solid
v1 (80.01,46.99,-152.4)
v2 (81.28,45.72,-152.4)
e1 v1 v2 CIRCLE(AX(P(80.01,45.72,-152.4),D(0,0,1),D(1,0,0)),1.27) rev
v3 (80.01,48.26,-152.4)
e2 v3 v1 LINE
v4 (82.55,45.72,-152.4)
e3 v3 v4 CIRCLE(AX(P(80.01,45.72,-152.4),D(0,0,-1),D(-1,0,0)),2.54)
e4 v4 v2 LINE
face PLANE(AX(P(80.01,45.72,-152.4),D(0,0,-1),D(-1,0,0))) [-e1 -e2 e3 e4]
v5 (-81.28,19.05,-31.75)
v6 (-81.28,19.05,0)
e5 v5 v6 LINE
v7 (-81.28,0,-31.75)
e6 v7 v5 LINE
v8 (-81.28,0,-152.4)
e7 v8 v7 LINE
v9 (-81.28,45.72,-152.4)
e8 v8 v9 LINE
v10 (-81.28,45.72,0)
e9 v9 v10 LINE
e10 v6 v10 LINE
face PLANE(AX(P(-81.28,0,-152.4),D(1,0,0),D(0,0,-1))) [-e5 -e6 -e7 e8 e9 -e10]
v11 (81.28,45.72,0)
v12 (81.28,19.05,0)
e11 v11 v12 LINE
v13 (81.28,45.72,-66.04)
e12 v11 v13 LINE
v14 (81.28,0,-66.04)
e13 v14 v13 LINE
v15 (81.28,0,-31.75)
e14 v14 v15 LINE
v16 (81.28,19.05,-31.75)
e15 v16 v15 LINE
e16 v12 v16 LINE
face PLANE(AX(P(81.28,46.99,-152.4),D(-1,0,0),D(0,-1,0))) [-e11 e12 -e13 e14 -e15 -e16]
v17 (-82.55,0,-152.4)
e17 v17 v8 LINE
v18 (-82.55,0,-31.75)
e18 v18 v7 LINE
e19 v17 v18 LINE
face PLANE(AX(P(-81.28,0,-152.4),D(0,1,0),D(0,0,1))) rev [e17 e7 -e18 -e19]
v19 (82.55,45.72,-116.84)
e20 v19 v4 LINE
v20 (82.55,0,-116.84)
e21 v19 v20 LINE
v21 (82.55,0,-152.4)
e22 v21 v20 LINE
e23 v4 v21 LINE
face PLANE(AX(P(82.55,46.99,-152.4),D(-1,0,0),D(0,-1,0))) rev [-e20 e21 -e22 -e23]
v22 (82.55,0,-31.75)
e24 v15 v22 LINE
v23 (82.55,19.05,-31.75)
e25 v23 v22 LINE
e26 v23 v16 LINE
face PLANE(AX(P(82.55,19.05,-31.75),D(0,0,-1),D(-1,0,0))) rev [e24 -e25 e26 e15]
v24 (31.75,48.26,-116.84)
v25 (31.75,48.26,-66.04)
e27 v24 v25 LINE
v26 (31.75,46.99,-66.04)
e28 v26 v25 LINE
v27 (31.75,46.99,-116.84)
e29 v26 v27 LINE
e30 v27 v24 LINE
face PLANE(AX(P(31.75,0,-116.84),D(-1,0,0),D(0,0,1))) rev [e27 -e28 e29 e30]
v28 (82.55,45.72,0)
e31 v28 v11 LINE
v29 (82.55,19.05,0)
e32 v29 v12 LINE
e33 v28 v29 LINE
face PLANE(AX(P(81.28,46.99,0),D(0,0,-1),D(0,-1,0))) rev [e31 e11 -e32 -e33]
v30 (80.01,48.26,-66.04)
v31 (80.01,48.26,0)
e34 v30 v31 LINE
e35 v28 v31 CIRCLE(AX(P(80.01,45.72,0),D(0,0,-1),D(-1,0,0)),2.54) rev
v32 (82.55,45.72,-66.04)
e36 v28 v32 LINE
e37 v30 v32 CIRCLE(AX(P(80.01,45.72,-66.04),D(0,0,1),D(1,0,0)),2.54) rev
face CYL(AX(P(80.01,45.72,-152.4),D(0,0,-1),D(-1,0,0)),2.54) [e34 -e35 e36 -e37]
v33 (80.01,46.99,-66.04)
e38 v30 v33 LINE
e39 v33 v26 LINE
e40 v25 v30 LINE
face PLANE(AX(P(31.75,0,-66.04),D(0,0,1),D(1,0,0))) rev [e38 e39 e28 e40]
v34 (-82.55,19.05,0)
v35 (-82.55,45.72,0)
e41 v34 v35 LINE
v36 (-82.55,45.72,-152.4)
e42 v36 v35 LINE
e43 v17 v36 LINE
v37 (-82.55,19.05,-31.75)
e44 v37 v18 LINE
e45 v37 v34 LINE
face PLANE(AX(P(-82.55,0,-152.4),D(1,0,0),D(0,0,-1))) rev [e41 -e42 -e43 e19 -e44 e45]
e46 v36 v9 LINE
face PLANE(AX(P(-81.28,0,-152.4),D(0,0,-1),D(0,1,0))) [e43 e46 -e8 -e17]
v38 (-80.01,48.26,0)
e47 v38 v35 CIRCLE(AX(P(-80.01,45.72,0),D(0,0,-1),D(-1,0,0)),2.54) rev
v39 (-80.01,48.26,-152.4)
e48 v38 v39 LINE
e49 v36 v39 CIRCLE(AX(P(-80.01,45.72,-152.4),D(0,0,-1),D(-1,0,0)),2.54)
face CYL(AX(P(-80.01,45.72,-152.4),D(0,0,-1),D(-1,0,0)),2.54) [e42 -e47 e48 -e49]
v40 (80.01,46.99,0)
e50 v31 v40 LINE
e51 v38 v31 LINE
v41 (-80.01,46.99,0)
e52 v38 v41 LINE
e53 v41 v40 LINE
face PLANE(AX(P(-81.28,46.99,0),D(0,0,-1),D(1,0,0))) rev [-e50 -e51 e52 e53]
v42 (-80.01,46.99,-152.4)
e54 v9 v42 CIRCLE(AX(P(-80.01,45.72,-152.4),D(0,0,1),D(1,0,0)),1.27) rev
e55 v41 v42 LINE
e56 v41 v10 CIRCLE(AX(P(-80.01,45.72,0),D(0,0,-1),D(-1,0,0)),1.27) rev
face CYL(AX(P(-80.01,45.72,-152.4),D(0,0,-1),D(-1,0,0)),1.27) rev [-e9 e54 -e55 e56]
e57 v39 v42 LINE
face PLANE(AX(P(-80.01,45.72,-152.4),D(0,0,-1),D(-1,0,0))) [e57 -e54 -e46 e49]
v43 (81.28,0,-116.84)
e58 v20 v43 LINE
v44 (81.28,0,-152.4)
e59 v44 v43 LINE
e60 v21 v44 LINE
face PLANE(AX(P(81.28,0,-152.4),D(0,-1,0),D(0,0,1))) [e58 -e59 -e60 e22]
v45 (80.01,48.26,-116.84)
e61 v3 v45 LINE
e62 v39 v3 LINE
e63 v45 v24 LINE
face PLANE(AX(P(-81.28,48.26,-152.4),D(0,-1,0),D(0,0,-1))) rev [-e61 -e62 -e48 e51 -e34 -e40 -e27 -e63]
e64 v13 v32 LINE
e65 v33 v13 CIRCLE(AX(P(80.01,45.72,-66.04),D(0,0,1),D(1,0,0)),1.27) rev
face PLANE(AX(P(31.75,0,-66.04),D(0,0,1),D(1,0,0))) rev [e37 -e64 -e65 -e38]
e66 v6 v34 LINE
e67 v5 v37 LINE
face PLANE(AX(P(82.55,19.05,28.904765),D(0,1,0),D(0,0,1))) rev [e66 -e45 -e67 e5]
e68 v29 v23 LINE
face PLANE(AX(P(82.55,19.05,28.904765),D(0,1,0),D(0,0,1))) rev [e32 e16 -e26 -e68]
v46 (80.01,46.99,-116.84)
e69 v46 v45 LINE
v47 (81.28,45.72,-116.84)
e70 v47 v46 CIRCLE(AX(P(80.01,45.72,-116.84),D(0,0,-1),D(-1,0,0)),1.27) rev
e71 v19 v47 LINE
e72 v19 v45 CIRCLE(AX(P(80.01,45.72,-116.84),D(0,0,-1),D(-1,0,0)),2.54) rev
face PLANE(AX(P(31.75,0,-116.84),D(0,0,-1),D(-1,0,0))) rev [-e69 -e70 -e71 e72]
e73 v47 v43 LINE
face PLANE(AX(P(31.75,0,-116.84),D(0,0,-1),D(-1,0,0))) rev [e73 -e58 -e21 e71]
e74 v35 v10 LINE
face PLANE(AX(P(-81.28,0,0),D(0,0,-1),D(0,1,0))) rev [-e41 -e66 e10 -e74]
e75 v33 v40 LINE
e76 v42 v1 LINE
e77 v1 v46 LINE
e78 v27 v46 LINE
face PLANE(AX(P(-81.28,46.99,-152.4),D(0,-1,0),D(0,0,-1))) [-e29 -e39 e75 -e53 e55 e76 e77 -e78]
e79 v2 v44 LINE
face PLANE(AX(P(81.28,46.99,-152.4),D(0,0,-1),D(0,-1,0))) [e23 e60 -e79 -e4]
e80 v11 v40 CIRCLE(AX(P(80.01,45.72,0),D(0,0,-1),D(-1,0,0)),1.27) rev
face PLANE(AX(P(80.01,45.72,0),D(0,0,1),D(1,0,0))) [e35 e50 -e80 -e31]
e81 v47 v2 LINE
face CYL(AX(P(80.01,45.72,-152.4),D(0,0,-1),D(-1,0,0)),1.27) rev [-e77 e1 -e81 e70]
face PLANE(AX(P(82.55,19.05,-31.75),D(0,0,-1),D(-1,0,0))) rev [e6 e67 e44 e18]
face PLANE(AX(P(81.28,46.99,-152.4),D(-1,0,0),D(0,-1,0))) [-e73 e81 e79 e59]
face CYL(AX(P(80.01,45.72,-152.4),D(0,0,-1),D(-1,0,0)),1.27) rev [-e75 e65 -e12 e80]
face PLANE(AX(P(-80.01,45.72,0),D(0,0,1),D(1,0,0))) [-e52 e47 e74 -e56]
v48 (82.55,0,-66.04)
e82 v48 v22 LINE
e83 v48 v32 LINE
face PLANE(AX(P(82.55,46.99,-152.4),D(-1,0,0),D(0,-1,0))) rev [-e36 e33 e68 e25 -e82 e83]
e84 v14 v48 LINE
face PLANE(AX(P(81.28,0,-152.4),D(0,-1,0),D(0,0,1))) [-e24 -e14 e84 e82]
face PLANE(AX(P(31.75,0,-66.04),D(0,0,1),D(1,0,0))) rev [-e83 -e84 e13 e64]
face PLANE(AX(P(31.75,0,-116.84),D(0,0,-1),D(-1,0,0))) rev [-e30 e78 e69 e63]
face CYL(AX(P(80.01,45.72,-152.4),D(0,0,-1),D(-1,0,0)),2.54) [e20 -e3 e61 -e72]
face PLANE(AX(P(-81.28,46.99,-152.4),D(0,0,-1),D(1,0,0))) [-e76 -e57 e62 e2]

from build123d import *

# Parameters (mm, degrees)
BOSS_EXTRUDE1_DEPTH    = 152.4
CONVERT_SOLID1_START   = -152.4
CONVERT_SOLID1_DEPTH   = 152.4
CONVERT_SOLID1_2_DEPTH = 152.4
SKETCH6_W              = 60.654765258
SKETCH6_H              = 35.589797731
CUT_EXTRUDE1_DEPTH     = 230.810351377
SKETCH7_W              = 82.570052287
SKETCH7_H              = 50.8
CUT_EXTRUDE2_DEPTH     = 180.914674499


# Read off the part's stored shape, not the designer's step: Convert-Solid1
with BuildPart() as part:
    # Sketch1 → Boss-Extrude1 (new body)
    with BuildSketch(Plane.XY):
        Polygon((-82.55, 0), (-82.55, 48.26), (82.55, 48.26), (82.55, 0), (81.28, 0), (81.28, 46.99), (-81.28, 46.99), (-81.28, 0), align=None)
    extrude(amount=-BOSS_EXTRUDE1_DEPTH)

    # Convert-Solid1 outline → Convert-Solid1 (cut)
    with BuildSketch(Plane.XY.offset(CONVERT_SOLID1_START)):
        with BuildLine():
            Line((82.55, 48.26), (80.01, 48.26))
            ThreePointArc((80.01, 48.26), (81.806051224, 47.516051224), (82.55, 45.72))
            Line((82.55, 45.72), (82.55, 48.26))
        make_face()
        with BuildLine():
            ThreePointArc((-82.55, 45.72), (-81.806051224, 47.516051224), (-80.01, 48.26))
            Line((-80.01, 48.26), (-82.55, 48.26))
            Line((-82.55, 48.26), (-82.55, 45.72))
        make_face()
    extrude(amount=CONVERT_SOLID1_DEPTH, mode=Mode.SUBTRACT)

    # Convert-Solid1 2 outline → Convert-Solid1 2 (add)
    with BuildSketch(Plane.XY.offset(CONVERT_SOLID1_START)):
        with BuildLine():
            Line((81.28, 46.99), (80.01, 46.99))
            ThreePointArc((80.01, 46.99), (80.908025612, 46.618025612), (81.28, 45.72))
            Line((81.28, 45.72), (81.28, 46.99))
        make_face()
        with BuildLine():
            ThreePointArc((-81.28, 45.72), (-80.908025612, 46.618025612), (-80.01, 46.99))
            Line((-80.01, 46.99), (-81.28, 46.99))
            Line((-81.28, 46.99), (-81.28, 45.72))
        make_face()
    extrude(amount=CONVERT_SOLID1_2_DEPTH)

    # Sketch6 → Cut-Extrude1 (cut, through all)
    with BuildSketch(Plane.ZY.offset(82.55)):
        with Locations((-1.422617371, 1.255101135)):
            Rectangle(SKETCH6_W, SKETCH6_H)
    extrude(amount=-CUT_EXTRUDE1_DEPTH, mode=Mode.SUBTRACT)

    # Sketch7 → Cut-Extrude2 (cut, through all)
    with BuildSketch(Plane(origin=(0, 48.26, 0), x_dir=(1, 0, 0), z_dir=(0, 1, 0))):
        with Locations((73.035026144, 91.44)):
            Rectangle(SKETCH7_W, SKETCH7_H)
    extrude(amount=-CUT_EXTRUDE2_DEPTH, mode=Mode.SUBTRACT)


solid = part.part
